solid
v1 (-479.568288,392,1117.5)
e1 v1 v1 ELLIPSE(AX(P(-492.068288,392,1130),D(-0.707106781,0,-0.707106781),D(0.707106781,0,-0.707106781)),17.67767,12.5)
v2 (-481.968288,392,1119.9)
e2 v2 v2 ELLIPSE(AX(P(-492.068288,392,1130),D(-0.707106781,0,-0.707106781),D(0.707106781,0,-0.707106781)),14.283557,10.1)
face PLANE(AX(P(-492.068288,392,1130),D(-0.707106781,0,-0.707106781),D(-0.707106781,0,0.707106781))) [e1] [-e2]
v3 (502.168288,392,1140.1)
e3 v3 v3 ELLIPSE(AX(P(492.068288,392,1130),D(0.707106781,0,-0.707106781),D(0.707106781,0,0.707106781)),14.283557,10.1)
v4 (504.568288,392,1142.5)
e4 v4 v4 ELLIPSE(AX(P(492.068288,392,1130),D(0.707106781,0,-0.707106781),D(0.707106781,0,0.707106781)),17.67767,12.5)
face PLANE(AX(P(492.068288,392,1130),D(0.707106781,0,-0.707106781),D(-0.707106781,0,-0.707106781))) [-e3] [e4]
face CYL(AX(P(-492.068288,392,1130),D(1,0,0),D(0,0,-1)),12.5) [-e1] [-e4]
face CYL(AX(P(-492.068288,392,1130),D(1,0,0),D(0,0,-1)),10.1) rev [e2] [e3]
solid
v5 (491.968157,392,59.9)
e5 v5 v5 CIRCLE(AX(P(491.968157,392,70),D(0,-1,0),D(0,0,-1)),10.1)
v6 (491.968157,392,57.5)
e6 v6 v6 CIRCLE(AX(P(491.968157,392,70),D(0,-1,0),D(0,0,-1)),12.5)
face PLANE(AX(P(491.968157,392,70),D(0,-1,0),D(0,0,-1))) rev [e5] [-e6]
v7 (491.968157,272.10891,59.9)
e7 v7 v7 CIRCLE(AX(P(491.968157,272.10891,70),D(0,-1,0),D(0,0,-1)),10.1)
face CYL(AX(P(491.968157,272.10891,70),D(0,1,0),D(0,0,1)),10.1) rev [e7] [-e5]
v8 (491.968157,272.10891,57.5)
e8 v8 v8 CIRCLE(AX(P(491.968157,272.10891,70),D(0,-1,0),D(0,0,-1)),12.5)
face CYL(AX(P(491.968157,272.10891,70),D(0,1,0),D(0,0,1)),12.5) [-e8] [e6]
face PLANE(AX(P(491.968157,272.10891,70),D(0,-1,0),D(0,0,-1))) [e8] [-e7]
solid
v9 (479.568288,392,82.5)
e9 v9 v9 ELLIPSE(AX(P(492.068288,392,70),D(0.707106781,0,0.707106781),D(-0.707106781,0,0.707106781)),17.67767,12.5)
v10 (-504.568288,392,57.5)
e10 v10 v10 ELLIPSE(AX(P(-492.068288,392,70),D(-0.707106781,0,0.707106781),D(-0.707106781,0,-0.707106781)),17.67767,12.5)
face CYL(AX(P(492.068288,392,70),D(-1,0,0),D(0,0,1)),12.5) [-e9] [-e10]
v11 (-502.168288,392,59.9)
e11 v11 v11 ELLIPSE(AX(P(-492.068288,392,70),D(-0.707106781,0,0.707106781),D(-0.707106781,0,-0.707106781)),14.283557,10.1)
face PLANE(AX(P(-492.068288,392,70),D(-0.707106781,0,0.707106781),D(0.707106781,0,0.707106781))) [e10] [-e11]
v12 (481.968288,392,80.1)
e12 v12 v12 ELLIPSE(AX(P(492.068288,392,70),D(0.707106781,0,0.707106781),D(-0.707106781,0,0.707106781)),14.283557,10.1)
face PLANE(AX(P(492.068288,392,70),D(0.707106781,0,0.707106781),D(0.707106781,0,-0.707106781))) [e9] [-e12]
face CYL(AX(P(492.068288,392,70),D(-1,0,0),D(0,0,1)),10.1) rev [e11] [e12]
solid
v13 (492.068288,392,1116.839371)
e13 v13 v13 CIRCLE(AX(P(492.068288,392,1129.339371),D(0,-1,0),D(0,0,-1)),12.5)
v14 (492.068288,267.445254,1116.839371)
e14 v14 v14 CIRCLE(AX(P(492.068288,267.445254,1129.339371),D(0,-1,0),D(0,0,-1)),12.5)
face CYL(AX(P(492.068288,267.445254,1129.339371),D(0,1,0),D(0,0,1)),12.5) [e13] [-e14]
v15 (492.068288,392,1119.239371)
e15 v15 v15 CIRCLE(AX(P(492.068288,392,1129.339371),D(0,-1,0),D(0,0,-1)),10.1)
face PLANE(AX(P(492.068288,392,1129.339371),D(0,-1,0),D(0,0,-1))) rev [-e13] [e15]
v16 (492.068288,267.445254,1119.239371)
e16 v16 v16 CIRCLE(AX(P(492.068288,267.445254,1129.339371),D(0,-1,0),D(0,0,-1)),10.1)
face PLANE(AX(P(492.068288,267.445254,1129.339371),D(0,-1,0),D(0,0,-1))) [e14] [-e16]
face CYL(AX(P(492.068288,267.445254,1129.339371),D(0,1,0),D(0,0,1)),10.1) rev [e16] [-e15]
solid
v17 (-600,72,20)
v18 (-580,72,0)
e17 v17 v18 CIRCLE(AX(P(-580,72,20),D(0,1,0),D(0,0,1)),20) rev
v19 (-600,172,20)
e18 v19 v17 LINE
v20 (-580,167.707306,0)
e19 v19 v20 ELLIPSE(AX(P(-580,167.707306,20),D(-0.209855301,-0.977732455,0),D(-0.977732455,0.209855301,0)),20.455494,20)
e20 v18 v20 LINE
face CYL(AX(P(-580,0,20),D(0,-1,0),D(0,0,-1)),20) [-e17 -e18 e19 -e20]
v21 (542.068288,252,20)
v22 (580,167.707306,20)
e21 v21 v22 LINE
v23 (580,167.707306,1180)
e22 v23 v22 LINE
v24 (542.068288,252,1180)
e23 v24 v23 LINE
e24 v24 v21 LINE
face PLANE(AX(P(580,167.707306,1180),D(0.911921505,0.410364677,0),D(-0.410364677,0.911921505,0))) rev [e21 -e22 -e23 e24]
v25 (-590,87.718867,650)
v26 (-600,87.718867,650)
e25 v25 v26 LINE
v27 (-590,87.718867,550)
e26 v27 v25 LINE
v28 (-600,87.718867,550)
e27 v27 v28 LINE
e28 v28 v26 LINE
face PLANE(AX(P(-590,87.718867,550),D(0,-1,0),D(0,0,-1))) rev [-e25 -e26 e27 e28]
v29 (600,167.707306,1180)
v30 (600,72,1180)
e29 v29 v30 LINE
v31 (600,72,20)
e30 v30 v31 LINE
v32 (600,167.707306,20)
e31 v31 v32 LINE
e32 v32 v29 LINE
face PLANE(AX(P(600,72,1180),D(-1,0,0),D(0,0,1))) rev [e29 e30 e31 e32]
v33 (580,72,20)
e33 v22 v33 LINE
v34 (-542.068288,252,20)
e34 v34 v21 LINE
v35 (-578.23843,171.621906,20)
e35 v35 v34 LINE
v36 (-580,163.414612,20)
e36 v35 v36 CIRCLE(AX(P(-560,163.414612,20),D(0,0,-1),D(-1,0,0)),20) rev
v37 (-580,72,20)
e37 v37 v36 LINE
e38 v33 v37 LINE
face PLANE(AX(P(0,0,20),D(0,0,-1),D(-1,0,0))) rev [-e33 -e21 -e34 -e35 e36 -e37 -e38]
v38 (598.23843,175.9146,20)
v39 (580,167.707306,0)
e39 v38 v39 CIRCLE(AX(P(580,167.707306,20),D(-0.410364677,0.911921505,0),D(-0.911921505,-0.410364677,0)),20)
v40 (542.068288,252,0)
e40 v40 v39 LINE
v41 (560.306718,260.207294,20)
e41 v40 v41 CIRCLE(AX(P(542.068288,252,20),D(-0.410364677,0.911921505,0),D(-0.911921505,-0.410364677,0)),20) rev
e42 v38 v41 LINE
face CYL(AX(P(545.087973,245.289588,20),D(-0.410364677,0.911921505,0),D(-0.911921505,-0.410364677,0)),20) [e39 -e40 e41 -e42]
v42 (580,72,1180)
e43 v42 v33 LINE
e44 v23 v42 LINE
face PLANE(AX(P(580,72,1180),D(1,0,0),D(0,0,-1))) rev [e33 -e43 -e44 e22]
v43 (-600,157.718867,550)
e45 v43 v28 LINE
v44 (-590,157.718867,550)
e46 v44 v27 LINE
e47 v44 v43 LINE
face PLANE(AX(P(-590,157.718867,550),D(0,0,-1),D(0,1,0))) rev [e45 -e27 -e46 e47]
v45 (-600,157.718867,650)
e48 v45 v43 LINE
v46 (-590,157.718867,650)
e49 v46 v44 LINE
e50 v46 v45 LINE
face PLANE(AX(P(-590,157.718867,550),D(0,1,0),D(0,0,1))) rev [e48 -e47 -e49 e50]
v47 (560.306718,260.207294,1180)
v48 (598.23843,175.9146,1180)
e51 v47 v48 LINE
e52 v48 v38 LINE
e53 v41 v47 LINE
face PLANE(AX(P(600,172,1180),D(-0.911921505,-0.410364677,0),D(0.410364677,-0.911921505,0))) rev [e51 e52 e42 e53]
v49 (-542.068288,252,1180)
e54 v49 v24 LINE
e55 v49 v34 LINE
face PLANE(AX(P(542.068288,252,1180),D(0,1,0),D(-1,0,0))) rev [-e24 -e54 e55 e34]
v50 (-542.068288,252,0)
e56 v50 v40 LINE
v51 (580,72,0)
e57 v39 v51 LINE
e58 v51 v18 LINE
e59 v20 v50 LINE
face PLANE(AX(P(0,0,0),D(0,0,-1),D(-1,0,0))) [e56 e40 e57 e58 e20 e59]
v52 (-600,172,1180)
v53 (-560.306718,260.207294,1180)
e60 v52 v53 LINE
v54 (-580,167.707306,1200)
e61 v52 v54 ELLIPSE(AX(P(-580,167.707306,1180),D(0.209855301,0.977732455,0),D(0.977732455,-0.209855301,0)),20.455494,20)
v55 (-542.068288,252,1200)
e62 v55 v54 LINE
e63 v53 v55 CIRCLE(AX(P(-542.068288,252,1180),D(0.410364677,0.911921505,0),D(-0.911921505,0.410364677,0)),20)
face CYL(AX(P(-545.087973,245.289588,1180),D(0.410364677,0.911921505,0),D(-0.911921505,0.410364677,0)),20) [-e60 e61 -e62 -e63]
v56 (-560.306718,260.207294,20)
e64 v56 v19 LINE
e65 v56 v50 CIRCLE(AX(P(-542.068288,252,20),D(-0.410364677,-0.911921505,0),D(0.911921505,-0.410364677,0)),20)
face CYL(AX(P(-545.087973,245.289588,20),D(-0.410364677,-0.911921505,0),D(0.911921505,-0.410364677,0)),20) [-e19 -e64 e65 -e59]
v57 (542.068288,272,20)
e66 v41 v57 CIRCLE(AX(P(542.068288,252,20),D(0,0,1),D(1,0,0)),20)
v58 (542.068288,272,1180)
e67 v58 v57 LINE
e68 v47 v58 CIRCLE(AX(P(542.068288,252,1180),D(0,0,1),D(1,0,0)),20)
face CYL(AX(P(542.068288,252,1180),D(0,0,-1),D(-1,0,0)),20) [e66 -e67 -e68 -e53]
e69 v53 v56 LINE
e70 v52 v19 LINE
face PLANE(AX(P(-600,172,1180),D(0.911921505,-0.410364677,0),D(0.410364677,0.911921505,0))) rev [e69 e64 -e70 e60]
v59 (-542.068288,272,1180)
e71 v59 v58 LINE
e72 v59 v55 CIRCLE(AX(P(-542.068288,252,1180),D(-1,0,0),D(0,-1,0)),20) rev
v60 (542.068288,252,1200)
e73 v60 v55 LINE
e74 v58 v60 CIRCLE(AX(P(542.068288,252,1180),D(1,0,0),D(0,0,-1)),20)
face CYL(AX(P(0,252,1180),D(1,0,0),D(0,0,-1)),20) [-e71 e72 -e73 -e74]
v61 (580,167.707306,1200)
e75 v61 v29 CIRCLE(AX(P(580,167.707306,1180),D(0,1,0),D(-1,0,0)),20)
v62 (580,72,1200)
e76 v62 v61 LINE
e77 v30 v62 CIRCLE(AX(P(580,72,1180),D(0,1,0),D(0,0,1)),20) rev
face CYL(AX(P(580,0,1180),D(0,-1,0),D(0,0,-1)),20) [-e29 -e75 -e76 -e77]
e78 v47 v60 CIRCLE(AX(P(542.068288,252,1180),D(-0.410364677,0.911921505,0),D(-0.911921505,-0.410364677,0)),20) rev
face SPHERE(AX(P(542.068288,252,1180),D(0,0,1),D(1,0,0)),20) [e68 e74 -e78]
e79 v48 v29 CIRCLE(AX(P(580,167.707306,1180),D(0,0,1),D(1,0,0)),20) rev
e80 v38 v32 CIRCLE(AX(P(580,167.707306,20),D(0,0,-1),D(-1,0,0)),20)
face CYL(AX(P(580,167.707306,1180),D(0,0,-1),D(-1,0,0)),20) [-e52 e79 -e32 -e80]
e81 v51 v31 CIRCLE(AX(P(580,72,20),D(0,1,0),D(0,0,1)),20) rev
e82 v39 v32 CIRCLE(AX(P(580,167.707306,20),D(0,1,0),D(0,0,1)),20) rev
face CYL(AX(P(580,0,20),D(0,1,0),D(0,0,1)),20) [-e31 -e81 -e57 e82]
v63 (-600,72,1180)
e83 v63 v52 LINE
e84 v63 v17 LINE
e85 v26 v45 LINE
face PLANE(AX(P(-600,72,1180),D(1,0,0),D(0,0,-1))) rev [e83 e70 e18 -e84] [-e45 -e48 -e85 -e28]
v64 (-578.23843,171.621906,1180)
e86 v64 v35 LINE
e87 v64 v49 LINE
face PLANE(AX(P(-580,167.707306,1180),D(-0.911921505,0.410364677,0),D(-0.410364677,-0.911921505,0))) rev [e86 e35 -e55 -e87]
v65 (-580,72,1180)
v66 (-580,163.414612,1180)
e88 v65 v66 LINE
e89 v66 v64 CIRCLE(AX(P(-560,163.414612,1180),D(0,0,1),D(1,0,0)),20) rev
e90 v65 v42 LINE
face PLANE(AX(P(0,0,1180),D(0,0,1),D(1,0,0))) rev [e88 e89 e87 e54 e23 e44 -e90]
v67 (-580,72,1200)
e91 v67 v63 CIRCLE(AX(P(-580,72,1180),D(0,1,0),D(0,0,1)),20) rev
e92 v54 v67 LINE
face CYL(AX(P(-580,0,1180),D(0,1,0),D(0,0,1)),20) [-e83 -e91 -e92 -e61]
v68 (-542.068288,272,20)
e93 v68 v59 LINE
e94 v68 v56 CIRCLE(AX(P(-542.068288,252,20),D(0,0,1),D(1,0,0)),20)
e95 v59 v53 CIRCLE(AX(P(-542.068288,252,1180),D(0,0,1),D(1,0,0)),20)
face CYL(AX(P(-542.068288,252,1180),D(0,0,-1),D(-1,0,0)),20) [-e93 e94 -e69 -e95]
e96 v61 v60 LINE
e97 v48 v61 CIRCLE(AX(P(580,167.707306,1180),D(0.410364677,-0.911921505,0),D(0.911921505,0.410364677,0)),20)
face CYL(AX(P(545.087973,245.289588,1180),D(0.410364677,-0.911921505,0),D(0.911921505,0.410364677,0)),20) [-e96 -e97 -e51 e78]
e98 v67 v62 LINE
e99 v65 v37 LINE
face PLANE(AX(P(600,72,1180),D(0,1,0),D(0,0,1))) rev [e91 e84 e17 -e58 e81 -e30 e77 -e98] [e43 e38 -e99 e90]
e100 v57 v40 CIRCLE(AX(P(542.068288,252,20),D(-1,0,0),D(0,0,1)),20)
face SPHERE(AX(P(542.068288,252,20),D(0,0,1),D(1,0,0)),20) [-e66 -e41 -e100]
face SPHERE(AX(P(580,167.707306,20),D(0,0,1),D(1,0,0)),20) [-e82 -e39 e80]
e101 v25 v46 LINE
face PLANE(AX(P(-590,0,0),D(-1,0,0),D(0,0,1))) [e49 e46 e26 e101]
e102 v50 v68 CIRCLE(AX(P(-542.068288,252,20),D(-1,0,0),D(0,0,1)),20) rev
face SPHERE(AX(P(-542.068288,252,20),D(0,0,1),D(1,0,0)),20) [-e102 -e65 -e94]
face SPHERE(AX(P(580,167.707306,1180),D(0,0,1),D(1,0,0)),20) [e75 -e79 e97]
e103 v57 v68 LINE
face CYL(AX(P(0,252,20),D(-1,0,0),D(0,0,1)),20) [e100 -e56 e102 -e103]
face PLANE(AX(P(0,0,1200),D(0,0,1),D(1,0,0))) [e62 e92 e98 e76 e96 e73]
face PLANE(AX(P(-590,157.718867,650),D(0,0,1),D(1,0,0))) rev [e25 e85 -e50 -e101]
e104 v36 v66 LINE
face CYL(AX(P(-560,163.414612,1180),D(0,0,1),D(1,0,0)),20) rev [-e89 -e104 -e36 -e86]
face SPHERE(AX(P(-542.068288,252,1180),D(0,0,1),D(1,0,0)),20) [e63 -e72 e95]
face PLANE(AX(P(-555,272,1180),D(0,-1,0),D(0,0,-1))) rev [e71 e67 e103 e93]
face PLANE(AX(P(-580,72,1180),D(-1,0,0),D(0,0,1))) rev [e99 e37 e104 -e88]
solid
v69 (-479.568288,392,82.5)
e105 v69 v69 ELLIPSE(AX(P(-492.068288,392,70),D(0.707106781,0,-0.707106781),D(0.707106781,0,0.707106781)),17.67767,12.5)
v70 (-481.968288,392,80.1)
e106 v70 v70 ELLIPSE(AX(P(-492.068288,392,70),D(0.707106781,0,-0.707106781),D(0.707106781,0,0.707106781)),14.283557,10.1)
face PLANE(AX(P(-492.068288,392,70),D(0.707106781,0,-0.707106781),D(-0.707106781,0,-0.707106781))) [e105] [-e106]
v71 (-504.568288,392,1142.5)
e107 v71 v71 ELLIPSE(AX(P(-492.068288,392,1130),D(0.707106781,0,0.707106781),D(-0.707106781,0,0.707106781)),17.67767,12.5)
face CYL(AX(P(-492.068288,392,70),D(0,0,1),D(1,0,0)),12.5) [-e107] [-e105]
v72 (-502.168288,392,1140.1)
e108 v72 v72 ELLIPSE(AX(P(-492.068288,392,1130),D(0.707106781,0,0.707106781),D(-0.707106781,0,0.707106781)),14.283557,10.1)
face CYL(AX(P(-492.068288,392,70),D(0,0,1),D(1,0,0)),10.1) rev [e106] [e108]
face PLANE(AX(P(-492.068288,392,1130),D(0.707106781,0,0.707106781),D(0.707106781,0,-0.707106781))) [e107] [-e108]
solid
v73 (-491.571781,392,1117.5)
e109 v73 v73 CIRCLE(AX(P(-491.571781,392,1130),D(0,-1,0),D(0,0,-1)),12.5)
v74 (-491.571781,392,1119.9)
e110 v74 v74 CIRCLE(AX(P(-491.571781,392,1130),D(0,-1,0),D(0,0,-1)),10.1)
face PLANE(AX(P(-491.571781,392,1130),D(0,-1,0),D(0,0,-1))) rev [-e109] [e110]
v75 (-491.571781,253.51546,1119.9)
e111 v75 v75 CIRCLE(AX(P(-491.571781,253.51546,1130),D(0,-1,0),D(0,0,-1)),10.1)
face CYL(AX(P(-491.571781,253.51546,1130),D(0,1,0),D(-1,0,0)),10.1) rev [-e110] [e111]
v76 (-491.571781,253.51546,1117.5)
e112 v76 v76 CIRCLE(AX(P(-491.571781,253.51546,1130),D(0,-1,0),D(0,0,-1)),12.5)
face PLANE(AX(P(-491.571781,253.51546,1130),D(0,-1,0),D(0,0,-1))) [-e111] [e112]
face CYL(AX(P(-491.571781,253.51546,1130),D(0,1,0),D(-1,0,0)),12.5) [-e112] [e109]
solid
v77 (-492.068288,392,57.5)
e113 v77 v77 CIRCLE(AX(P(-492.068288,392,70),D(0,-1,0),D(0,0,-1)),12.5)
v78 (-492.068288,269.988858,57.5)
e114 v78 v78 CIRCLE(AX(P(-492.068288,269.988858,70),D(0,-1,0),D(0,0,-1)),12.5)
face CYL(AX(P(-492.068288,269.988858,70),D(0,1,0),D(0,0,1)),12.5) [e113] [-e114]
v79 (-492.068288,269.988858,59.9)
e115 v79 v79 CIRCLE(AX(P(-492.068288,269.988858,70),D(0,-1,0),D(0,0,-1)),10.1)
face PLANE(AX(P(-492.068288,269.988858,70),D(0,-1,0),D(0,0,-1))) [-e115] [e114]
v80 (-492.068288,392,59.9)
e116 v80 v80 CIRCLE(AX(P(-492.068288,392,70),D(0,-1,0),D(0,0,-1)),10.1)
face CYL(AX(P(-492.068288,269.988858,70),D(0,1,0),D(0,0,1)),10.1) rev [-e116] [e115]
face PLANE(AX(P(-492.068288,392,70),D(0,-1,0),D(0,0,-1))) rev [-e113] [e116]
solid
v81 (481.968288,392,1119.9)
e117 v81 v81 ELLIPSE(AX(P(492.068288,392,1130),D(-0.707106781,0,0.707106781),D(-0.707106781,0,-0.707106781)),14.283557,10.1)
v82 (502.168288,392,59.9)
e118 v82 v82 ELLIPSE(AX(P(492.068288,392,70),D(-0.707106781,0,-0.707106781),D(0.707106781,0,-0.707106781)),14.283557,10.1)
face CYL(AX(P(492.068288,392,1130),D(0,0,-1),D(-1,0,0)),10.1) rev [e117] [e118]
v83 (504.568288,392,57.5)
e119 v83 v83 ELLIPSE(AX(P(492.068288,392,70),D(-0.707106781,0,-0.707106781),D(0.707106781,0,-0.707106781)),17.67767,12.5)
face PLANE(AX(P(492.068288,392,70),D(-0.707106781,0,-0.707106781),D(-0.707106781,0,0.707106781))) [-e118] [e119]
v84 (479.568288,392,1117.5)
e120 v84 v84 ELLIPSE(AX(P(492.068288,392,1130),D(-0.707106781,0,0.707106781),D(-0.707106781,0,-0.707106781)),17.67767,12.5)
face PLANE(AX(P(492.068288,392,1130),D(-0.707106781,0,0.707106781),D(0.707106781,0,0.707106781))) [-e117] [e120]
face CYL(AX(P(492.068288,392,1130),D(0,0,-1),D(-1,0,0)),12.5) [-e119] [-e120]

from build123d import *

# Parameters (mm, degrees)
BOSS_EXTRUDE1_START             = 20
BOSS_EXTRUDE1_DEPTH             = 1160
BOSS_EXTRUDE2_DEPTH             = 20
BOSS_EXTRUDE3_DEPTH             = 20
FILLET3_R                       = 20
FILLET4_R                       = 20
ROUND_END_25_X_2_4_1_DEPTH      = 1002.814245131
ROUND_END_25_X_2_4_1_DEPTH_BACK = 18.67766953
SKETCH1_R                       = 12.5
SKETCH1_R_2                     = 10.1
SKETCH1_ON_SEGMENT_2_R          = 12.5
SKETCH1_ON_SEGMENT_2_R_2        = 10.1
ROUND_END_25_X_2_4_1_2_DEPTH    = 1097.355339059
SKETCH1_ON_SEGMENT_3_R          = 12.5
SKETCH1_ON_SEGMENT_3_R_2        = 10.1
ROUND_END_25_X_2_4_1_3_DEPTH    = 1021.49191466
SKETCH1_ON_SEGMENT_4_R          = 12.5
SKETCH1_ON_SEGMENT_4_R_2        = 10.1
ROUND_END_25_X_2_4_1_4_DEPTH    = 1097.355339059
SKETCH11_R                      = 12.5
SKETCH11_R_2                    = 10.1
ROUND_END_25_X_2_4_2_DEPTH      = 119.891090049
SKETCH11_ON_SEGMENT_2_R         = 12.5
SKETCH11_ON_SEGMENT_2_R_2       = 10.1
ROUND_END_25_X_2_4_2_2_DEPTH    = 122.011142464
SKETCH11_ON_SEGMENT_3_R         = 12.5
SKETCH11_ON_SEGMENT_3_R_2       = 10.1
ROUND_END_25_X_2_4_2_3_DEPTH    = 124.554746476
SKETCH11_ON_SEGMENT_4_R         = 12.5
SKETCH11_ON_SEGMENT_4_R_2       = 10.1
ROUND_END_25_X_2_4_2_4_DEPTH    = 138.484540408
SKETCH12_W                      = 100
SKETCH12_H                      = 70
CUT_EXTRUDE1_DEPTH              = 10


with BuildPart() as part:
    # Sketch2 → Boss-Extrude1 (new body)
    with BuildSketch(Plane.XY.offset(BOSS_EXTRUDE1_START)):
        Polygon((-600, 72), (-600, 172), (-555, 272), (0, 272), (555, 272), (600, 172), (600, 72), (580, 72), (580, 167.707306223), (542.068287801, 252), (0, 252), (-542.068287801, 252), (-580, 167.707306223), (-580, 72), align=None)
    extrude(amount=BOSS_EXTRUDE1_DEPTH)

    # Sketch3 → Boss-Extrude2 (add)
    with BuildSketch(Plane.XY.offset(1180)):
        Polygon((600, 72), (600, 172), (555, 272), (-555, 272), (-600, 172), (-600, 72), align=None)
    extrude(amount=BOSS_EXTRUDE2_DEPTH)

    # Sketch4 → Boss-Extrude3 (add)
    with BuildSketch(Plane(origin=(0, 0, 20), x_dir=(-1, 0, 0), z_dir=(0, 0, -1))):
        Polygon((600, 172), (600, 72), (-600, 72), (-600, 172), (-555, 272), (555, 272), align=None)
    extrude(amount=BOSS_EXTRUDE3_DEPTH)

    # Fillet3
    fillet3_edges = [part.edges().sort_by_distance(p)[0] for p in [
        (-577.5, 222, 0),
        (0, 272, 0),
        (577.5, 222, 0),
        (600, 122, 0),
        (-600, 122, 0),
    ]]
    fillet(fillet3_edges, radius=FILLET3_R)

    # Fillet4
    # the kernel refuses this fillet: 20 mm, written as the material it adds along each edge
    with BuildSketch(Plane(origin=(-580, 167.707306223, 9.268265559), x_dir=(0, -1, 0), z_dir=(0, 0, 1))) as fillet4_piece_1:
        with BuildLine():
            CenterArc((FILLET4_R * 0.214634688829, FILLET4_R), FILLET4_R, 245.772254682, 24.227745318)
            Line((-FILLET4_R * 0.1957299885, FILLET4_R * 0.0880784948249), (0, 0))
            Line((0, 0), (FILLET4_R * 0.214634688829, 0))
        make_face()
    fillet4_piece_1_solid = extrude(amount=1181.463468883, mode=Mode.PRIVATE)
    add([fillet4_piece_1_solid])
    # the kernel refuses this fillet: 20 mm, written as the material it takes off along each edge
    with BuildSketch(Plane(origin=(580, 167.707306223, 20), x_dir=(1, 0, 0), z_dir=(0, 0, -1))) as fillet4_2_piece_1_section:
        Polygon((0, 0), (FILLET4_R, 0), (FILLET4_R, -FILLET4_R * 0.214634688829), (FILLET4_R * 0.911921505175, -FILLET4_R * 0.410364677329), align=None)
    fillet4_2_piece_1 = extrude(amount=FILLET4_R, mode=Mode.PRIVATE)
    fillet4_2_piece_1 = fillet4_2_piece_1 - Plane(origin=(580, 167.707306223, 20), x_dir=(-0.9777324545025357, -0.20985530113020012, 0), z_dir=(0, 0, -1)) * Sphere(FILLET4_R, mode=Mode.PRIVATE)
    with BuildSketch(Plane(origin=(542.068287801, 252, 20), x_dir=(0, 1, 0), z_dir=(0, 0, -1))) as fillet4_2_piece_2_section:
        Polygon((0, 0), (FILLET4_R, 0), (FILLET4_R, FILLET4_R * 0.646585609973), (FILLET4_R * 0.410364677329, FILLET4_R * 0.911921505175), align=None)
    fillet4_2_piece_2 = extrude(amount=FILLET4_R, mode=Mode.PRIVATE)
    fillet4_2_piece_2 = fillet4_2_piece_2 - Plane(origin=(542.068287801, 252, 20), x_dir=(-0.5429711422678011, -0.83975135526202, 0), z_dir=(0, 0, -1)) * Sphere(FILLET4_R, mode=Mode.PRIVATE)
    with BuildSketch(Plane(origin=(-542.068287801, 252, 20), x_dir=(-0.9119215051751061, 0.41036467732879867, 0), z_dir=(0, 0, -1))) as fillet4_2_piece_3_section:
        Polygon((0, 0), (FILLET4_R, 0), (FILLET4_R, FILLET4_R * 0.646585609973), (FILLET4_R * 0.410364677329, FILLET4_R * 0.911921505175), align=None)
    fillet4_2_piece_3 = extrude(amount=FILLET4_R, mode=Mode.PRIVATE)
    fillet4_2_piece_3 = fillet4_2_piece_3 - Plane(origin=(-542.068287801, 252, 20), x_dir=(0.5429711422678011, -0.83975135526202, 0), z_dir=(0, 0, -1)) * Sphere(FILLET4_R, mode=Mode.PRIVATE)
    with BuildSketch(Plane(origin=(-542.068287801, 252, 1180), x_dir=(0, 1, 0), z_dir=(0, 0, 1))) as fillet4_2_piece_4_section:
        Polygon((0, 0), (FILLET4_R, 0), (FILLET4_R, FILLET4_R * 0.646585609973), (FILLET4_R * 0.410364677329, FILLET4_R * 0.911921505175), align=None)
    fillet4_2_piece_4 = extrude(amount=FILLET4_R, mode=Mode.PRIVATE)
    fillet4_2_piece_4 = fillet4_2_piece_4 - Plane(origin=(-542.068287801, 252, 1180), x_dir=(0.5429711422678011, -0.83975135526202, 0), z_dir=(0, 0, 1)) * Sphere(FILLET4_R, mode=Mode.PRIVATE)
    with BuildSketch(Plane(origin=(542.068287801, 252, 1180), x_dir=(0, 1, 0), z_dir=(0, 0, 1))) as fillet4_2_piece_5_section:
        Polygon((0, 0), (FILLET4_R, 0), (FILLET4_R, -FILLET4_R * 0.646585609973), (FILLET4_R * 0.410364677329, -FILLET4_R * 0.911921505175), align=None)
    fillet4_2_piece_5 = extrude(amount=FILLET4_R, mode=Mode.PRIVATE)
    fillet4_2_piece_5 = fillet4_2_piece_5 - Plane(origin=(542.068287801, 252, 1180), x_dir=(-0.5429711422678011, -0.83975135526202, 0), z_dir=(0, 0, 1)) * Sphere(FILLET4_R, mode=Mode.PRIVATE)
    with BuildSketch(Plane(origin=(580, 167.707306223, 1180), x_dir=(1, 0, 0), z_dir=(0, 0, 1))) as fillet4_2_piece_6_section:
        Polygon((0, 0), (FILLET4_R, 0), (FILLET4_R, FILLET4_R * 0.214634688829), (FILLET4_R * 0.911921505175, FILLET4_R * 0.410364677329), align=None)
    fillet4_2_piece_6 = extrude(amount=FILLET4_R, mode=Mode.PRIVATE)
    fillet4_2_piece_6 = fillet4_2_piece_6 - Plane(origin=(580, 167.707306223, 1180), x_dir=(-0.9777324545025357, -0.20985530113020012, 0), z_dir=(0, 0, 1)) * Sphere(FILLET4_R, mode=Mode.PRIVATE)
    with BuildSketch(Plane(origin=(-555, 272, 1180), x_dir=(-0.41036467732879983, -0.9119215051751054, 0), z_dir=(0, 0, -1))) as fillet4_2_piece_7:
        with BuildLine():
            CenterArc((FILLET4_R * 0.646585609973, -FILLET4_R), FILLET4_R, 90, 65.772254682)
            Line((-FILLET4_R * 0.265335895202, -FILLET4_R * 0.589635322671), (0, 0))
            Line((0, 0), (FILLET4_R * 0.646585609973, 0))
        make_face()
    fillet4_2_piece_7_solid = extrude(amount=1160, mode=Mode.PRIVATE)
    with BuildSketch(Plane(origin=(555, 272, 20), x_dir=(-1, 0, 0), z_dir=(0, 0, 1))) as fillet4_2_piece_8:
        with BuildLine():
            CenterArc((FILLET4_R * 0.646585609973, FILLET4_R), FILLET4_R, 204.227745318, 65.772254682)
            Line((-FILLET4_R * 0.265335895202, FILLET4_R * 0.589635322671), (0, 0))
            Line((0, 0), (FILLET4_R * 0.646585609973, 0))
        make_face()
    fillet4_2_piece_8_solid = extrude(amount=1160, mode=Mode.PRIVATE)
    with BuildSketch(Plane(origin=(600, 172, 20), x_dir=(0, -1, 0), z_dir=(0, 0, 1))) as fillet4_2_piece_9:
        with BuildLine():
            CenterArc((FILLET4_R * 0.214634688829, -FILLET4_R), FILLET4_R, 90, 24.227745318)
            Line((-FILLET4_R * 0.1957299885, -FILLET4_R * 0.0880784948249), (0, 0))
            Line((0, 0), (FILLET4_R * 0.214634688829, 0))
        make_face()
    fillet4_2_piece_9_solid = extrude(amount=1160, mode=Mode.PRIVATE)
    with BuildSketch(Plane(origin=(600, 22, 1200), x_dir=(-1, 0, 0), z_dir=(0, 1, 0))) as fillet4_2_piece_10:
        with BuildLine():
            CenterArc((FILLET4_R, -FILLET4_R), FILLET4_R, 90, 90)
            Line((0, -FILLET4_R), (0, 0))
            Line((0, 0), (FILLET4_R, 0))
        make_face()
    fillet4_2_piece_10_solid = extrude(amount=145.707306223, mode=Mode.PRIVATE)
    with BuildSketch(Plane(origin=(598.238430104, 175.91459977, 1200), x_dir=(-0.911921505175106, -0.41036467732879867, 0), z_dir=(-0.41036467732879867, 0.9119215051751061, 0))) as fillet4_2_piece_11:
        with BuildLine():
            CenterArc((FILLET4_R, -FILLET4_R), FILLET4_R, 90, 90)
            Line((0, -FILLET4_R), (0, 0))
            Line((0, 0), (FILLET4_R, 0))
        make_face()
    fillet4_2_piece_11_solid = extrude(amount=92.434155021, mode=Mode.PRIVATE)
    with BuildSketch(Plane(origin=(542.068287801, 272, 1200), x_dir=(0, -1, 0), z_dir=(-1, 0, 0))) as fillet4_2_piece_12:
        with BuildLine():
            CenterArc((FILLET4_R, -FILLET4_R), FILLET4_R, 90, 90)
            Line((0, -FILLET4_R), (0, 0))
            Line((0, 0), (FILLET4_R, 0))
        make_face()
    fillet4_2_piece_12_solid = extrude(amount=1084.136575601, mode=Mode.PRIVATE)
    with BuildSketch(Plane(origin=(-560.306717904, 260.207293547, 1200), x_dir=(0, 0, -1), z_dir=(-0.41036467732879867, -0.9119215051751061, 0))) as fillet4_2_piece_13:
        with BuildLine():
            CenterArc((FILLET4_R, FILLET4_R), FILLET4_R, 180, 90)
            Line((0, FILLET4_R), (0, 0))
            Line((0, 0), (FILLET4_R, 0))
        make_face()
    fillet4_2_piece_13_solid = extrude(amount=146.726848798, mode=Mode.PRIVATE)
    with BuildSketch(Plane(origin=(-600, 222, 1200), x_dir=(0, 0, -1), z_dir=(0, -1, 0))) as fillet4_2_piece_14:
        with BuildLine():
            CenterArc((FILLET4_R, FILLET4_R), FILLET4_R, 180, 90)
            Line((0, FILLET4_R), (0, 0))
            Line((0, 0), (FILLET4_R, 0))
        make_face()
    fillet4_2_piece_14_solid = extrude(amount=200, mode=Mode.PRIVATE)
    add([fillet4_2_piece_1, fillet4_2_piece_2, fillet4_2_piece_3, fillet4_2_piece_4, fillet4_2_piece_5, fillet4_2_piece_6, fillet4_2_piece_7_solid, fillet4_2_piece_8_solid, fillet4_2_piece_9_solid, fillet4_2_piece_10_solid, fillet4_2_piece_11_solid, fillet4_2_piece_12_solid, fillet4_2_piece_13_solid, fillet4_2_piece_14_solid], mode=Mode.SUBTRACT)

    # Sketch12 → Cut-Extrude1 (cut)
    with BuildSketch(Plane.ZY.offset(600)):
        with Locations((600, 122.718867289)):
            Rectangle(SKETCH12_W, SKETCH12_H)
    extrude(amount=-CUT_EXTRUDE1_DEPTH, mode=Mode.SUBTRACT)


with BuildPart() as body_2:
    # Sketch1 → Round end 25 X 2.4(1) (new, two sides: drawn at the far end of the back side and taken through both)
    with BuildSketch(Plane(origin=(492.068287801, 392, 1130), x_dir=(0, 0, 1), z_dir=(-1, 0, 0)).offset(-ROUND_END_25_X_2_4_1_DEPTH_BACK)):
        Circle(SKETCH1_R)
        Circle(SKETCH1_R_2, mode=Mode.SUBTRACT)
    extrude(amount=ROUND_END_25_X_2_4_1_DEPTH + ROUND_END_25_X_2_4_1_DEPTH_BACK)

    # Round end 25 X 2.4(1) mitre 1
    split(bisect_by=Plane(origin=(492.068287801, 392, 1130), x_dir=(0, -1, 0), z_dir=(-0.707106781, 0, 0.707106781)), keep=Keep.TOP)

    # Round end 25 X 2.4(1) mitre 2
    split(bisect_by=Plane(origin=(-492.068287801, 392, 1130), x_dir=(0, 1, 0), z_dir=(0.707106781, 0, 0.707106781)), keep=Keep.TOP)


with BuildPart() as body_3:
    # Sketch1 on segment 2 (carried to segment 2) → Round end 25 X 2.4_1 2 (new body)
    with BuildSketch(Plane(origin=(-492.068287801, 392, 1148.67766953), x_dir=(-1, 0, 0), z_dir=(0, 0, -1))):
        Circle(SKETCH1_ON_SEGMENT_2_R)
        Circle(SKETCH1_ON_SEGMENT_2_R_2, mode=Mode.SUBTRACT)
    extrude(amount=ROUND_END_25_X_2_4_1_2_DEPTH)

    # Round end 25 X 2.4_1 2 mitre 1
    split(bisect_by=Plane(origin=(-492.068287801, 392, 1130), x_dir=(0, -1, 0), z_dir=(-0.707106781, 0, -0.707106781)), keep=Keep.TOP)

    # Round end 25 X 2.4_1 2 mitre 2
    split(bisect_by=Plane(origin=(-492.068287801, 392, 70), x_dir=(0, -1, 0), z_dir=(-0.707106781, 0, 0.707106781)), keep=Keep.TOP)


with BuildPart() as body_4:
    # Sketch1 on segment 3 (carried to segment 3) → Round end 25 X 2.4_1 3 (new body)
    with BuildSketch(Plane(origin=(-510.74595733, 392, 70), x_dir=(0, 0, -1), z_dir=(1, 0, 0))):
        Circle(SKETCH1_ON_SEGMENT_3_R)
        Circle(SKETCH1_ON_SEGMENT_3_R_2, mode=Mode.SUBTRACT)
    extrude(amount=ROUND_END_25_X_2_4_1_3_DEPTH)

    # Round end 25 X 2.4_1 3 mitre 1
    split(bisect_by=Plane(origin=(-492.068287801, 392, 70), x_dir=(0, 1, 0), z_dir=(0.707106781, 0, -0.707106781)), keep=Keep.TOP)

    # Round end 25 X 2.4_1 3 mitre 2
    split(bisect_by=Plane(origin=(492.068287801, 392, 70), x_dir=(0, -1, 0), z_dir=(-0.707106781, 0, -0.707106781)), keep=Keep.TOP)


with BuildPart() as body_5:
    # Sketch1 on segment 4 (carried to segment 4) → Round end 25 X 2.4_1 4 (new body)
    with BuildSketch(Plane(origin=(492.068287801, 392, 51.32233047), x_dir=(1, 0, 0), z_dir=(0, 0, 1))):
        Circle(SKETCH1_ON_SEGMENT_4_R)
        Circle(SKETCH1_ON_SEGMENT_4_R_2, mode=Mode.SUBTRACT)
    extrude(amount=ROUND_END_25_X_2_4_1_4_DEPTH)

    # Round end 25 X 2.4_1 4 mitre 1
    split(bisect_by=Plane(origin=(492.068287801, 392, 70), x_dir=(0, 1, 0), z_dir=(0.707106781, 0, 0.707106781)), keep=Keep.TOP)

    # Round end 25 X 2.4_1 4 mitre 2
    split(bisect_by=Plane(origin=(492.068287801, 392, 1130), x_dir=(0, 1, 0), z_dir=(0.707106781, 0, -0.707106781)), keep=Keep.TOP)


with BuildPart() as body_6:
    # Sketch11 → Round end 25 X 2.4(2) (new body)
    with BuildSketch(Plane(origin=(491.96815688, 392, 70), x_dir=(1, 0, 0), z_dir=(0, -1, 0))):
        Circle(SKETCH11_R)
        Circle(SKETCH11_R_2, mode=Mode.SUBTRACT)
    extrude(amount=ROUND_END_25_X_2_4_2_DEPTH)


with BuildPart() as body_7:
    # Sketch11 on segment 2 (carried to segment 2) → Round end 25 X 2.4_2 2 (new body)
    with BuildSketch(Plane(origin=(-492.068287801, 392, 70), x_dir=(1, 0, 0), z_dir=(0, -1, 0))):
        Circle(SKETCH11_ON_SEGMENT_2_R)
        Circle(SKETCH11_ON_SEGMENT_2_R_2, mode=Mode.SUBTRACT)
    extrude(amount=ROUND_END_25_X_2_4_2_2_DEPTH)


with BuildPart() as body_8:
    # Sketch11 on segment 3 (carried to segment 3) → Round end 25 X 2.4_2 3 (new body)
    with BuildSketch(Plane(origin=(492.068287801, 392, 1129.339370667), x_dir=(1, 0, 0), z_dir=(0, -1, 0))):
        Circle(SKETCH11_ON_SEGMENT_3_R)
        Circle(SKETCH11_ON_SEGMENT_3_R_2, mode=Mode.SUBTRACT)
    extrude(amount=ROUND_END_25_X_2_4_2_3_DEPTH)


with BuildPart() as body_9:
    # Sketch11 on segment 4 (carried to segment 4) → Round end 25 X 2.4_2 4 (new body)
    with BuildSketch(Plane(origin=(-491.571781073, 392, 1130), x_dir=(1, 0, 0), z_dir=(0, -1, 0))):
        Circle(SKETCH11_ON_SEGMENT_4_R)
        Circle(SKETCH11_ON_SEGMENT_4_R_2, mode=Mode.SUBTRACT)
    extrude(amount=ROUND_END_25_X_2_4_2_4_DEPTH)


solid = Compound([part.part, body_2.part, body_3.part, body_4.part, body_5.part, body_6.part, body_7.part, body_8.part, body_9.part])
